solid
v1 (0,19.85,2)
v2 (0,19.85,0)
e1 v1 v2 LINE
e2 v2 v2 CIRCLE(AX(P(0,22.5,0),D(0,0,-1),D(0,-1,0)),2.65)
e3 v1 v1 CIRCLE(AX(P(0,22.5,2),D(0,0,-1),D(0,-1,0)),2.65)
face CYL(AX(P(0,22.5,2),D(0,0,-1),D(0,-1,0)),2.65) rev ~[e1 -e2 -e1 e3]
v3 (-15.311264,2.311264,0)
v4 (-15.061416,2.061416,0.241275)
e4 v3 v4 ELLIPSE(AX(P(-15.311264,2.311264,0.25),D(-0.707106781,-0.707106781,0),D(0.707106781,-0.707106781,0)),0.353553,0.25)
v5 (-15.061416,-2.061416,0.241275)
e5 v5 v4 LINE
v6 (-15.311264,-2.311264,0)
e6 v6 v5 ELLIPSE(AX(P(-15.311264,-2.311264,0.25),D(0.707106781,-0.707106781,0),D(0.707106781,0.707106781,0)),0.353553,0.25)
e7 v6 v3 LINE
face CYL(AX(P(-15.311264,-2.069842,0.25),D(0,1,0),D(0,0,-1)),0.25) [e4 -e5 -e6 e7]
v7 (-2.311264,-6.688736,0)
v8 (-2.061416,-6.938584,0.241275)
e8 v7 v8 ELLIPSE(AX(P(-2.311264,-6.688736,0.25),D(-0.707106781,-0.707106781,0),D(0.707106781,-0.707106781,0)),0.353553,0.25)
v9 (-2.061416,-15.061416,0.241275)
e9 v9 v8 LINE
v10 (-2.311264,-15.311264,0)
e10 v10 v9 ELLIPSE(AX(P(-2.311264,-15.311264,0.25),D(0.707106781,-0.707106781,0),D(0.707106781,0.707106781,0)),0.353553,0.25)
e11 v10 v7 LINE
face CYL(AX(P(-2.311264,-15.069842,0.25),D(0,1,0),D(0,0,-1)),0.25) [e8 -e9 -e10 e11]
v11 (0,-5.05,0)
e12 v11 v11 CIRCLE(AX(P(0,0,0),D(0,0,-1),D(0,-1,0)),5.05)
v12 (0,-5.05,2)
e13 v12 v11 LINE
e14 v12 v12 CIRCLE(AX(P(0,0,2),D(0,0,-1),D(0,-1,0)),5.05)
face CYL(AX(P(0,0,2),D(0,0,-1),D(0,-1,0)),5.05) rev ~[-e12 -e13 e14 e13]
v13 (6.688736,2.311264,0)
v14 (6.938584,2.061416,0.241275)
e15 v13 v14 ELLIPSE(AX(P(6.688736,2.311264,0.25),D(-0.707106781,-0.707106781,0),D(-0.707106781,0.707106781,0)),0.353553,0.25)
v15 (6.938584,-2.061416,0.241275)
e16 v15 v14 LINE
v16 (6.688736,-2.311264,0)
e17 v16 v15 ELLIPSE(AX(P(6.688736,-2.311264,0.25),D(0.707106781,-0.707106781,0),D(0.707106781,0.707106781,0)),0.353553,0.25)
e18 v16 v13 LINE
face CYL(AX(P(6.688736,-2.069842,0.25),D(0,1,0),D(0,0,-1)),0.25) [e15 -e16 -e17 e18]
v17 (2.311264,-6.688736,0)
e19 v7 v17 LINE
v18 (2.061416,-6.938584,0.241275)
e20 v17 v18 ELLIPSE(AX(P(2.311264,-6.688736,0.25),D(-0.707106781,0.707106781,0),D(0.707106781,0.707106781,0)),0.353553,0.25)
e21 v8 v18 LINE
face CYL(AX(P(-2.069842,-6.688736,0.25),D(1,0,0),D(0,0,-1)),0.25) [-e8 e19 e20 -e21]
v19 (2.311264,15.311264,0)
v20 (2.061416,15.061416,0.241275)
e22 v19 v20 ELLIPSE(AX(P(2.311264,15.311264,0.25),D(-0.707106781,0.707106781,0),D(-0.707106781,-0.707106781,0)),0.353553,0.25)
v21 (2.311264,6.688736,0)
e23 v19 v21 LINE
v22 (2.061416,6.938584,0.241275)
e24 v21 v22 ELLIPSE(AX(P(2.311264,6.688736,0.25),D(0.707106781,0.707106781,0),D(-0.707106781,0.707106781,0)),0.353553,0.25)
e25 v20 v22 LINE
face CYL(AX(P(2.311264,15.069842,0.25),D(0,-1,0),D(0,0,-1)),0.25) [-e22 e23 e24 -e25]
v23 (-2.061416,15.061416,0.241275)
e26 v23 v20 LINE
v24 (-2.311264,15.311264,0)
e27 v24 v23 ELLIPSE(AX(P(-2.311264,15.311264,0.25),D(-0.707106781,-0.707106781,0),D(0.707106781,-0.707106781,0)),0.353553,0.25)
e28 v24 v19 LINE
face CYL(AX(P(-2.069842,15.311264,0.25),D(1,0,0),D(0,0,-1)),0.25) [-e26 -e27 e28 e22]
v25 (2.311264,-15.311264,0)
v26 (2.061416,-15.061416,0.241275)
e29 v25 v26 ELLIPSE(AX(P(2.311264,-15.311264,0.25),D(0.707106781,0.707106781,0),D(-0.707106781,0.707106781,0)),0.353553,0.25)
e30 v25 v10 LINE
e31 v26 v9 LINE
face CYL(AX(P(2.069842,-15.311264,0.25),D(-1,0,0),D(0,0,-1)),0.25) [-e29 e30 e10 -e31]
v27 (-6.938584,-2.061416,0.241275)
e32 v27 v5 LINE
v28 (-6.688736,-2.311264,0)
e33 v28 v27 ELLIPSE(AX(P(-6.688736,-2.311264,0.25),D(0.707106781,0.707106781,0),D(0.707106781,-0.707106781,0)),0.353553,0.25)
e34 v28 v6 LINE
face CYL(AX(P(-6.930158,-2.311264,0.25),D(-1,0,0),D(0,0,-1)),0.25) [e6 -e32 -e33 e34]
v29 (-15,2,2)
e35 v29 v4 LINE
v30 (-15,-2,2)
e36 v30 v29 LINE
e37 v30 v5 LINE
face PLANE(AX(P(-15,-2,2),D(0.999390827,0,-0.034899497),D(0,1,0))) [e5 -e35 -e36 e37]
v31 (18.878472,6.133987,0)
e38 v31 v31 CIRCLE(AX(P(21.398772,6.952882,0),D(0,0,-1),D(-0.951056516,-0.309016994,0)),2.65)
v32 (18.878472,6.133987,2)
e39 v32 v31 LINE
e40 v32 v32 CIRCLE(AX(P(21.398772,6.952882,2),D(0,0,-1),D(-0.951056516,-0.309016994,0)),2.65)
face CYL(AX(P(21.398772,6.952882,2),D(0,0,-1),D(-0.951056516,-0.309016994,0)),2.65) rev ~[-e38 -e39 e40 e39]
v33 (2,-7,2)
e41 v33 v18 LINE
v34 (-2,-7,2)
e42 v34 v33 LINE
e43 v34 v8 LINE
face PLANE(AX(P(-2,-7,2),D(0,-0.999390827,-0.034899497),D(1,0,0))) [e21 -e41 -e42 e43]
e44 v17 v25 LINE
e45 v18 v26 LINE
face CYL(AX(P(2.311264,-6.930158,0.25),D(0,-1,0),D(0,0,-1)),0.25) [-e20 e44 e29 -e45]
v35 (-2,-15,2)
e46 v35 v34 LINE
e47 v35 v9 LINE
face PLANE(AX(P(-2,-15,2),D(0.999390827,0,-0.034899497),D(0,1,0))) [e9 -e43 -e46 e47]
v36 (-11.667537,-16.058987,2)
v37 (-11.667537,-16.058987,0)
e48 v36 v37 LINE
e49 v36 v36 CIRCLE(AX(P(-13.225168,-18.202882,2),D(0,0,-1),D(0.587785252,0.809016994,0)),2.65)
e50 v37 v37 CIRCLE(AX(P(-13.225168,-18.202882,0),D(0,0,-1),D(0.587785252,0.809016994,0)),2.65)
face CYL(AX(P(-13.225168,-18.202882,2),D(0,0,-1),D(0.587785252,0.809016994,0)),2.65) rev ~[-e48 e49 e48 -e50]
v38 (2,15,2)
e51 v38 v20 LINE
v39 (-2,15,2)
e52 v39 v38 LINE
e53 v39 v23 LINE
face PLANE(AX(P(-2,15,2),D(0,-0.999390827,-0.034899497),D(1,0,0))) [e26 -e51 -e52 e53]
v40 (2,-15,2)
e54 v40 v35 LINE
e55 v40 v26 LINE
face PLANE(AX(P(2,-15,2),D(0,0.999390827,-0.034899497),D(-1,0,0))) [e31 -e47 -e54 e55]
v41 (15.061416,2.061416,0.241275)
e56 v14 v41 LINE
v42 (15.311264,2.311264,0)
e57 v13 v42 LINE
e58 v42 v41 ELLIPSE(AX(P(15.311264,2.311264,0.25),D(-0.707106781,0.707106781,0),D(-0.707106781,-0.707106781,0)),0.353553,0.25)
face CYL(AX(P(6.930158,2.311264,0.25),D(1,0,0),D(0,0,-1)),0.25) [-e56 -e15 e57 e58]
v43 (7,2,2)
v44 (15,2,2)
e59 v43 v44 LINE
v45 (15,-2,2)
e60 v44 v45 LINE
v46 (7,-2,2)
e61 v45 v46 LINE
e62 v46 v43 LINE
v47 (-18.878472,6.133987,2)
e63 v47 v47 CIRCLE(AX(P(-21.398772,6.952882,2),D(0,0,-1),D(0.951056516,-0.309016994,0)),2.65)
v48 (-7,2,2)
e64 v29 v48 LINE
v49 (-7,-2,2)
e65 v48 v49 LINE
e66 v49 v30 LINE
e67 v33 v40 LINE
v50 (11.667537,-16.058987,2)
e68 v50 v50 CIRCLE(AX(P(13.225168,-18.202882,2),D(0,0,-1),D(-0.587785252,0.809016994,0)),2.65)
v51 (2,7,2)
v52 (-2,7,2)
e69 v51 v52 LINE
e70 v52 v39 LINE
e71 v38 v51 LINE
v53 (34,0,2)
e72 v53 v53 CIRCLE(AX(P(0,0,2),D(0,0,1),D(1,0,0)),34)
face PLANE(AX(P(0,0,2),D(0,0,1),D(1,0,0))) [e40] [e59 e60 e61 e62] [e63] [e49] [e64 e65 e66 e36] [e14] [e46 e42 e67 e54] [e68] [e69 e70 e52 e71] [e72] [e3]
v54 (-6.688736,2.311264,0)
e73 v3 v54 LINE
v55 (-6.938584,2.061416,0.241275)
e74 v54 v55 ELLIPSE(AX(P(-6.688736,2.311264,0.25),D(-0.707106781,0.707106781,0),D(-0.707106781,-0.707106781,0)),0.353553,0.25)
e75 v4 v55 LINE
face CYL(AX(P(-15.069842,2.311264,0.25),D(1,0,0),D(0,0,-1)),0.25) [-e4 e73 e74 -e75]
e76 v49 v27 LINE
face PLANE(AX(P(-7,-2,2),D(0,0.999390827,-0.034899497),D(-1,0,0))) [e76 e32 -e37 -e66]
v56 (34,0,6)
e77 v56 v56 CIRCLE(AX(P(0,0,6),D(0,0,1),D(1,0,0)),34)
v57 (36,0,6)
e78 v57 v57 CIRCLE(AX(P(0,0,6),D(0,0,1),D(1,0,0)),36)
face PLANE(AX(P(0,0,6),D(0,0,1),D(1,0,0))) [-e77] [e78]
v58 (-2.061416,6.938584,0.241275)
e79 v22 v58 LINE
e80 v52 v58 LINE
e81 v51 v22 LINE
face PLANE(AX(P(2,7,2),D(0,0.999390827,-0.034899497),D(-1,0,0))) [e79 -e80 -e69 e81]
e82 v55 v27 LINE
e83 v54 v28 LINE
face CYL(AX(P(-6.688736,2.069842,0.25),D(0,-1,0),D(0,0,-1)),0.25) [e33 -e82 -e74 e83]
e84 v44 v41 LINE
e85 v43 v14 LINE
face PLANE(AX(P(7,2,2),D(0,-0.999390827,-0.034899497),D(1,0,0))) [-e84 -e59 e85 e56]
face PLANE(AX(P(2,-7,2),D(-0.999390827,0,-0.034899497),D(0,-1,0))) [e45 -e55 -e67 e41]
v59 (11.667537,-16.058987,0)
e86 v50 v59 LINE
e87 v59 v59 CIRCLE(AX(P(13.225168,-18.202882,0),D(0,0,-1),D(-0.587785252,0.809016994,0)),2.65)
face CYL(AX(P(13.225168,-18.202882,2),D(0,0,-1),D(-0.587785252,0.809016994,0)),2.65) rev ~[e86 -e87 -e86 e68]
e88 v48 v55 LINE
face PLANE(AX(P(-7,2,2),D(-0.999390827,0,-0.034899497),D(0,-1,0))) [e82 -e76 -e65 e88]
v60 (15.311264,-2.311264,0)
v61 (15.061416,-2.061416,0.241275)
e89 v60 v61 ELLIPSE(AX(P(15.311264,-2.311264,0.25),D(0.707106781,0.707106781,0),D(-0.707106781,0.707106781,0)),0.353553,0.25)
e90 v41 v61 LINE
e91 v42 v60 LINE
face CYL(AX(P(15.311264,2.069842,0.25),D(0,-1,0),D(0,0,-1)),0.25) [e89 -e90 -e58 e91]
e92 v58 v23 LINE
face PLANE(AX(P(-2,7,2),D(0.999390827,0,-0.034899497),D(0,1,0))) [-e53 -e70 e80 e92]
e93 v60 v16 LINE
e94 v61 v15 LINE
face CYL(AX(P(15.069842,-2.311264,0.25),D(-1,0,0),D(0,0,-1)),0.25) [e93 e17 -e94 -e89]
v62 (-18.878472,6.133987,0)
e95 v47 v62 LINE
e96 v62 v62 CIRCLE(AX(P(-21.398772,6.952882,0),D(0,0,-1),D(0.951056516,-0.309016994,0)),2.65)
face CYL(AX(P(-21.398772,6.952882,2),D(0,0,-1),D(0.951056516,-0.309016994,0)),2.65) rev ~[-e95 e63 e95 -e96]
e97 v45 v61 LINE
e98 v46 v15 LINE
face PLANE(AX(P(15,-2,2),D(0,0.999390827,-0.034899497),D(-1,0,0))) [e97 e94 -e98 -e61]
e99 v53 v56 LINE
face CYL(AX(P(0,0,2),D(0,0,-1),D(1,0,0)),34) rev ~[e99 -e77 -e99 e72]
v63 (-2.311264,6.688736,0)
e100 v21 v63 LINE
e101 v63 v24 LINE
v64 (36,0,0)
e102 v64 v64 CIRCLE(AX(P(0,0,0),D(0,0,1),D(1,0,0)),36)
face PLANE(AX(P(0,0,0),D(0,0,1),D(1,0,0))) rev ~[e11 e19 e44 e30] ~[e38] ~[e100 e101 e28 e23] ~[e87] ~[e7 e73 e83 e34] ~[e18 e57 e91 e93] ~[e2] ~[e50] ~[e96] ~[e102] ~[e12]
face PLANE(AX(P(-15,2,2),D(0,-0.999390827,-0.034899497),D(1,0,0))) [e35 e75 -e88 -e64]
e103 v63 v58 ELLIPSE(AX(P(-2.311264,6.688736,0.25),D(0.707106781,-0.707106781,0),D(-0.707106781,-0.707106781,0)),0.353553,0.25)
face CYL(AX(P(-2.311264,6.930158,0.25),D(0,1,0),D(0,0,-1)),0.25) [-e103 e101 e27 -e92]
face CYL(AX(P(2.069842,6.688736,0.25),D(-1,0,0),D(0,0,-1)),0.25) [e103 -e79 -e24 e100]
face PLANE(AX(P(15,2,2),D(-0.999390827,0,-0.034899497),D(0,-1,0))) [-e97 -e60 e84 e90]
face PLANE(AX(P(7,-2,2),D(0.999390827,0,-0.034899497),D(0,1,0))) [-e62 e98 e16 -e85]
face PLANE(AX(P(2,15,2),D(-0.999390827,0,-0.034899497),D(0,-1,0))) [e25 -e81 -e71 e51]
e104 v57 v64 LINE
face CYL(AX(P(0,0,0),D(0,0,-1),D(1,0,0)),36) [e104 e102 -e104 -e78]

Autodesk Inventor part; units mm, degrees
ref_plane "YZ Plane" through (0, 0, 0) normal (1, 0, 0) x (0, 1, 0)
ref_plane "XZ Plane" through (0, 0, 0) normal (0, 1, 0) x (-1, 0, 0)
ref_plane "XY Plane" through (0, 0, 0) normal (0, 0, 1) x (1, 0, 0)
sketch "Sketch1" plane through (0, 0, 0) normal (0, 0, 1) x (1, 0, 0)
  circle A0 centre (0, 0) radius 36
  dimension "d0" = 72
extrude "Extrusion1" add sketch "Sketch1" along normal blind 2
sketch "Sketch2" plane through (0, 0, 2) normal (0, 0, 1) x (1, 0, 0)
  circle A0 centre (0, 0) radius 36 projected
  circle A1 centre (0, 0) radius 34
  dimension "d3" = 2
extrude "Extrusion2" add sketch "Sketch2" along normal blind 4
sketch "Sketch4" plane through (0, 0, 2) normal (0, 0, 1) x (1, 0, 0)
  point P0 (0, 0)
  point P1 (0, 0)
hole "Hole1" at (0, 0, 2) direction (0, 0, -1) diameter 10.1 end through all
sketch "Sketch5" plane through (0, 0, 2) normal (0, 0, 1) x (1, 0, 0)
  point P0 (0, 0)
  point P1 (0, 22.5)
  dimension "d13" = 22.5
hole "Hole2" at (0, 22.5, 2) direction (0, 0, -1) diameter 5.3 end through all
pattern_circular "Circular Pattern1" count 5 over 360 about axis through (0, 0, -100) along (0, 0, 1) of "Hole2"
sketch "Sketch8" plane through (0, 0, 2) normal (0, 0, 1) x (1, 0, 0)
  circle A0 centre (21.3988, 6.9529) radius 2.65 projected
  circle A1 centre (13.2252, -18.2029) radius 2.65 projected
  circle A2 centre (-13.2252, -18.2029) radius 2.65 projected
  circle A3 centre (-21.3988, 6.9529) radius 2.65 projected
  circle A4 centre (0, 22.5) radius 2.65 projected
  circle A5 centre (0, 0) radius 5.05 projected
  circle A6 centre (0, 0) radius 34 projected
  line L0 (-2, 15) -> (2, 15)
  line L1 (2, 15) -> (2, 7)
  line L2 (2, 7) -> (-2, 7)
  line L3 (-2, 7) -> (-2, 15)
  dimension "d43" = 4
  dimension "d44" = 8
  dimension "d45" = 7
  dimension "d48" = 2
extrude "Extrusion5" cut sketch "Sketch8" against normal up to surface (2 mm away) draft 2 contours L0 L1 L2 L3
fillet "Fillet2" radius 0.25 4 edges at (0, 6.9302, 0) (2.0698, 11, 0) (0, 15.0698, 0) (-2.0698, 11, 0)
pattern_circular "Circular Pattern3" count 4 over 360 about axis through (0, 0, -100) along (0, 0, 1) of "Extrusion5", "Fillet2"
equation "\"d0\" = W_innerDiameter + W_wallThickness"
equation "\"d1\" = W_wallThickness"
equation "\"d3\" = W_wallThickness"
equation "\"d4\" = W_innerDepth"
equation "\"d6\" = W_innerGearHoleDiameter"
equation "\"d13\" = OG_distanceFromCenter"
equation "\"d14\" = W_outerGearHoleDiameter"
equation "\"W_wallThickness\" = 2"
equation "\"W_innerDepth\" = 4"
equation "\"W_innerGearHoleDiameter\" = 10.1"
equation "\"W_outerGearHoleDiameter\" = 5.3"
equation "\"OG_distanceFromCenter\" = 22.5"
equation "\"W_innerDiameter\" = 70"
equation "\"Wheel_Related_W_\" = 0"
equation "\"W_holesClearance\" = 0.3"
equation "\"TempSpotReserved7\" = 0"
equation "\"TempSpotReserved8\" = 0"
equation "\"TempSpotReserved9\" = 0"
equation "\"TempSpotReserved10\" = 0"
equation "\"TempSpotReserved11\" = 0"
equation "\"TempSpotReserved12\" = 0"
equation "\"TempSpotReserved13\" = 0"
equation "\"TempSpotReserved14\" = 0"
equation "\"TempSpotReserved15\" = 0"
equation "\"TempSpotReserved16\" = 0"
equation "\"TempSpotReserved17\" = 0"
equation "\"TempSpotReserved18\" = 0"
equation "\"TempSpotReserved19\" = 0"
equation "\"TempSpotReserved20\" = 0"
equation "\"Inner_Gear_Related_IG_\" = 0"
equation "\"IG_shaftDiameter\" = 7.5"
equation "\"IG_shaftLength\" = 17"
equation "\"IG_gearThickness\" = 2"
equation "\"TempSpotReserved25\" = 0"
equation "\"TempSpotReserved26\" = 0"
equation "\"TempSpotReserved27\" = 0"
equation "\"TempSpotReserved28\" = 0"
equation "\"TempSpotReserved29\" = 0"
equation "\"TempSpotReserved30\" = 0"
equation "\"TempSpotReserved31\" = 0"
equation "\"TempSpotReserved32\" = 0"
equation "\"TempSpotReserved33\" = 0"
equation "\"TempSpotReserved34\" = 0"
equation "\"TempSpotReserved35\" = 0"
equation "\"TempSpotReserved36\" = 0"
equation "\"TempSpotReserved37\" = 0"
equation "\"TempSpotReserved38\" = 0"
equation "\"TempSpotReserved39\" = 0"
equation "\"TempSpotReserved40\" = 0"
equation "\"Outer_Gear_Related_OG_\" = 0"
equation "\"OG_shaftDiameter\" = 5"
equation "\"OG_gearDiameter\" = 25"
equation "\"OG_shaftLength\" = 9"
equation "\"OG_gearThickness\" = 2"
equation "\"TempSpotReserved47\" = 0"
equation "\"TempSpotReserved48\" = 0"
equation "\"TempSpotReserved49\" = 0"
equation "\"TempSpotReserved50\" = 0"
equation "\"TempSpotReserved51\" = 0"
equation "\"TempSpotReserved52\" = 0"
equation "\"TempSpotReserved53\" = 0"
equation "\"TempSpotReserved54\" = 0"
equation "\"TempSpotReserved55\" = 0"
equation "\"TempSpotReserved56\" = 0"
equation "\"TempSpotReserved57\" = 0"
equation "\"TempSpotReserved58\" = 0"
equation "\"TempSpotReserved59\" = 0"
equation "\"TempSpotReserved60\" = 0"
equation "\"Leg_Extensions_Related_LE_\" = 0"
equation "\"LE_baseDiameter\" = 5"
equation "\"LE_maxLength\" = 23.67256"
equation "\"LE_thickness\" = 2.5"
equation "\"IG_ratioToOuterGear\" = 1.25"
equation "\"B_bearingThickness\" = 1"
equation "\"TempSpotReserved43\" = 0"
equation "\"TempSpotReserved45\" = 0"
equation "\"Thisisatest\" = 25.4"
equation "\"TempSpotReserved46\" = 0"
equation "\"TempSpotReserved44\" = 0"
equation "\"LE_offsetAboveOuterGear\" = 0"
equation "\"Bearing_Related_B_\" = 0"
equation "\"TempSpotReserved42\" = 0"
equation "\"OG_skirtOffset\" = 5"
equation "\"OG_skirtThickness\" = 1"
equation "\"IG_skirtThickness\" = 2"
equation "\"IG_extentionLength\" = 19.5"
equation "\"IG_extentionThickness\" = 3"
equation "\"IG_slitWidth\" = 4"
equation "\"IG_slitlength\" = 8"
equation "\"IG_slitClearance\" = 0.2"
equation "\"IG_slitDistanceFromCenterHole\" = 7"
equation "\"Reserved_10\" = 0"
equation "\"Reserved_9\" = 0"
equation "\"Reserved_11\" = 0"
equation "\"Reserved_12\" = 0"
equation "\"Reserved_8\" = 0"
equation "\"Reserved_7\" = 0"
equation "\"Reserved_26\" = 0"
equation "\"Reserved_20\" = 0"
equation "\"Reserved_22\" = 0"
equation "\"Reserved_23\" = 0"
equation "\"Reserved_25\" = 0"
equation "\"Reserved_24\" = 0"
equation "\"Reserved_21\" = 0"
equation "\"Reserved_19\" = 0"
equation "\"Reserved_27\" = 0"
equation "\"Reserved_14\" = 0"
equation "\"Reserved_15\" = 0"
equation "\"Reserved_16\" = 0"
equation "\"Reserved_13\" = 0"
equation "\"Reserved_17\" = 0"
equation "\"Reserved_18\" = 0"
equation "\"Bearing_Related_BR_\" = 0"
equation "\"BR_bearingThickness\" = 1"
equation "\"Block_Related_BL_\" = 0"
equation "\"BL_width\" = 3.8"
equation "\"BL_length\" = 7.8"
equation "\"W_filletRadius\" = 0.25"
equation "\"W_extrutsionTaperAngle\" = 2deg"
equation "\"OG_protrudeDistance\" = 3"
equation "\"IG_dAxleDepth\" = 5"
equation "\"IG_dAxleShort\" = 1.5"
equation "\"IG_dAxleCircleDiameter\" = 2"
equation "\"IG_gearRatio\" = 1.25"
properties part number "wheel"
